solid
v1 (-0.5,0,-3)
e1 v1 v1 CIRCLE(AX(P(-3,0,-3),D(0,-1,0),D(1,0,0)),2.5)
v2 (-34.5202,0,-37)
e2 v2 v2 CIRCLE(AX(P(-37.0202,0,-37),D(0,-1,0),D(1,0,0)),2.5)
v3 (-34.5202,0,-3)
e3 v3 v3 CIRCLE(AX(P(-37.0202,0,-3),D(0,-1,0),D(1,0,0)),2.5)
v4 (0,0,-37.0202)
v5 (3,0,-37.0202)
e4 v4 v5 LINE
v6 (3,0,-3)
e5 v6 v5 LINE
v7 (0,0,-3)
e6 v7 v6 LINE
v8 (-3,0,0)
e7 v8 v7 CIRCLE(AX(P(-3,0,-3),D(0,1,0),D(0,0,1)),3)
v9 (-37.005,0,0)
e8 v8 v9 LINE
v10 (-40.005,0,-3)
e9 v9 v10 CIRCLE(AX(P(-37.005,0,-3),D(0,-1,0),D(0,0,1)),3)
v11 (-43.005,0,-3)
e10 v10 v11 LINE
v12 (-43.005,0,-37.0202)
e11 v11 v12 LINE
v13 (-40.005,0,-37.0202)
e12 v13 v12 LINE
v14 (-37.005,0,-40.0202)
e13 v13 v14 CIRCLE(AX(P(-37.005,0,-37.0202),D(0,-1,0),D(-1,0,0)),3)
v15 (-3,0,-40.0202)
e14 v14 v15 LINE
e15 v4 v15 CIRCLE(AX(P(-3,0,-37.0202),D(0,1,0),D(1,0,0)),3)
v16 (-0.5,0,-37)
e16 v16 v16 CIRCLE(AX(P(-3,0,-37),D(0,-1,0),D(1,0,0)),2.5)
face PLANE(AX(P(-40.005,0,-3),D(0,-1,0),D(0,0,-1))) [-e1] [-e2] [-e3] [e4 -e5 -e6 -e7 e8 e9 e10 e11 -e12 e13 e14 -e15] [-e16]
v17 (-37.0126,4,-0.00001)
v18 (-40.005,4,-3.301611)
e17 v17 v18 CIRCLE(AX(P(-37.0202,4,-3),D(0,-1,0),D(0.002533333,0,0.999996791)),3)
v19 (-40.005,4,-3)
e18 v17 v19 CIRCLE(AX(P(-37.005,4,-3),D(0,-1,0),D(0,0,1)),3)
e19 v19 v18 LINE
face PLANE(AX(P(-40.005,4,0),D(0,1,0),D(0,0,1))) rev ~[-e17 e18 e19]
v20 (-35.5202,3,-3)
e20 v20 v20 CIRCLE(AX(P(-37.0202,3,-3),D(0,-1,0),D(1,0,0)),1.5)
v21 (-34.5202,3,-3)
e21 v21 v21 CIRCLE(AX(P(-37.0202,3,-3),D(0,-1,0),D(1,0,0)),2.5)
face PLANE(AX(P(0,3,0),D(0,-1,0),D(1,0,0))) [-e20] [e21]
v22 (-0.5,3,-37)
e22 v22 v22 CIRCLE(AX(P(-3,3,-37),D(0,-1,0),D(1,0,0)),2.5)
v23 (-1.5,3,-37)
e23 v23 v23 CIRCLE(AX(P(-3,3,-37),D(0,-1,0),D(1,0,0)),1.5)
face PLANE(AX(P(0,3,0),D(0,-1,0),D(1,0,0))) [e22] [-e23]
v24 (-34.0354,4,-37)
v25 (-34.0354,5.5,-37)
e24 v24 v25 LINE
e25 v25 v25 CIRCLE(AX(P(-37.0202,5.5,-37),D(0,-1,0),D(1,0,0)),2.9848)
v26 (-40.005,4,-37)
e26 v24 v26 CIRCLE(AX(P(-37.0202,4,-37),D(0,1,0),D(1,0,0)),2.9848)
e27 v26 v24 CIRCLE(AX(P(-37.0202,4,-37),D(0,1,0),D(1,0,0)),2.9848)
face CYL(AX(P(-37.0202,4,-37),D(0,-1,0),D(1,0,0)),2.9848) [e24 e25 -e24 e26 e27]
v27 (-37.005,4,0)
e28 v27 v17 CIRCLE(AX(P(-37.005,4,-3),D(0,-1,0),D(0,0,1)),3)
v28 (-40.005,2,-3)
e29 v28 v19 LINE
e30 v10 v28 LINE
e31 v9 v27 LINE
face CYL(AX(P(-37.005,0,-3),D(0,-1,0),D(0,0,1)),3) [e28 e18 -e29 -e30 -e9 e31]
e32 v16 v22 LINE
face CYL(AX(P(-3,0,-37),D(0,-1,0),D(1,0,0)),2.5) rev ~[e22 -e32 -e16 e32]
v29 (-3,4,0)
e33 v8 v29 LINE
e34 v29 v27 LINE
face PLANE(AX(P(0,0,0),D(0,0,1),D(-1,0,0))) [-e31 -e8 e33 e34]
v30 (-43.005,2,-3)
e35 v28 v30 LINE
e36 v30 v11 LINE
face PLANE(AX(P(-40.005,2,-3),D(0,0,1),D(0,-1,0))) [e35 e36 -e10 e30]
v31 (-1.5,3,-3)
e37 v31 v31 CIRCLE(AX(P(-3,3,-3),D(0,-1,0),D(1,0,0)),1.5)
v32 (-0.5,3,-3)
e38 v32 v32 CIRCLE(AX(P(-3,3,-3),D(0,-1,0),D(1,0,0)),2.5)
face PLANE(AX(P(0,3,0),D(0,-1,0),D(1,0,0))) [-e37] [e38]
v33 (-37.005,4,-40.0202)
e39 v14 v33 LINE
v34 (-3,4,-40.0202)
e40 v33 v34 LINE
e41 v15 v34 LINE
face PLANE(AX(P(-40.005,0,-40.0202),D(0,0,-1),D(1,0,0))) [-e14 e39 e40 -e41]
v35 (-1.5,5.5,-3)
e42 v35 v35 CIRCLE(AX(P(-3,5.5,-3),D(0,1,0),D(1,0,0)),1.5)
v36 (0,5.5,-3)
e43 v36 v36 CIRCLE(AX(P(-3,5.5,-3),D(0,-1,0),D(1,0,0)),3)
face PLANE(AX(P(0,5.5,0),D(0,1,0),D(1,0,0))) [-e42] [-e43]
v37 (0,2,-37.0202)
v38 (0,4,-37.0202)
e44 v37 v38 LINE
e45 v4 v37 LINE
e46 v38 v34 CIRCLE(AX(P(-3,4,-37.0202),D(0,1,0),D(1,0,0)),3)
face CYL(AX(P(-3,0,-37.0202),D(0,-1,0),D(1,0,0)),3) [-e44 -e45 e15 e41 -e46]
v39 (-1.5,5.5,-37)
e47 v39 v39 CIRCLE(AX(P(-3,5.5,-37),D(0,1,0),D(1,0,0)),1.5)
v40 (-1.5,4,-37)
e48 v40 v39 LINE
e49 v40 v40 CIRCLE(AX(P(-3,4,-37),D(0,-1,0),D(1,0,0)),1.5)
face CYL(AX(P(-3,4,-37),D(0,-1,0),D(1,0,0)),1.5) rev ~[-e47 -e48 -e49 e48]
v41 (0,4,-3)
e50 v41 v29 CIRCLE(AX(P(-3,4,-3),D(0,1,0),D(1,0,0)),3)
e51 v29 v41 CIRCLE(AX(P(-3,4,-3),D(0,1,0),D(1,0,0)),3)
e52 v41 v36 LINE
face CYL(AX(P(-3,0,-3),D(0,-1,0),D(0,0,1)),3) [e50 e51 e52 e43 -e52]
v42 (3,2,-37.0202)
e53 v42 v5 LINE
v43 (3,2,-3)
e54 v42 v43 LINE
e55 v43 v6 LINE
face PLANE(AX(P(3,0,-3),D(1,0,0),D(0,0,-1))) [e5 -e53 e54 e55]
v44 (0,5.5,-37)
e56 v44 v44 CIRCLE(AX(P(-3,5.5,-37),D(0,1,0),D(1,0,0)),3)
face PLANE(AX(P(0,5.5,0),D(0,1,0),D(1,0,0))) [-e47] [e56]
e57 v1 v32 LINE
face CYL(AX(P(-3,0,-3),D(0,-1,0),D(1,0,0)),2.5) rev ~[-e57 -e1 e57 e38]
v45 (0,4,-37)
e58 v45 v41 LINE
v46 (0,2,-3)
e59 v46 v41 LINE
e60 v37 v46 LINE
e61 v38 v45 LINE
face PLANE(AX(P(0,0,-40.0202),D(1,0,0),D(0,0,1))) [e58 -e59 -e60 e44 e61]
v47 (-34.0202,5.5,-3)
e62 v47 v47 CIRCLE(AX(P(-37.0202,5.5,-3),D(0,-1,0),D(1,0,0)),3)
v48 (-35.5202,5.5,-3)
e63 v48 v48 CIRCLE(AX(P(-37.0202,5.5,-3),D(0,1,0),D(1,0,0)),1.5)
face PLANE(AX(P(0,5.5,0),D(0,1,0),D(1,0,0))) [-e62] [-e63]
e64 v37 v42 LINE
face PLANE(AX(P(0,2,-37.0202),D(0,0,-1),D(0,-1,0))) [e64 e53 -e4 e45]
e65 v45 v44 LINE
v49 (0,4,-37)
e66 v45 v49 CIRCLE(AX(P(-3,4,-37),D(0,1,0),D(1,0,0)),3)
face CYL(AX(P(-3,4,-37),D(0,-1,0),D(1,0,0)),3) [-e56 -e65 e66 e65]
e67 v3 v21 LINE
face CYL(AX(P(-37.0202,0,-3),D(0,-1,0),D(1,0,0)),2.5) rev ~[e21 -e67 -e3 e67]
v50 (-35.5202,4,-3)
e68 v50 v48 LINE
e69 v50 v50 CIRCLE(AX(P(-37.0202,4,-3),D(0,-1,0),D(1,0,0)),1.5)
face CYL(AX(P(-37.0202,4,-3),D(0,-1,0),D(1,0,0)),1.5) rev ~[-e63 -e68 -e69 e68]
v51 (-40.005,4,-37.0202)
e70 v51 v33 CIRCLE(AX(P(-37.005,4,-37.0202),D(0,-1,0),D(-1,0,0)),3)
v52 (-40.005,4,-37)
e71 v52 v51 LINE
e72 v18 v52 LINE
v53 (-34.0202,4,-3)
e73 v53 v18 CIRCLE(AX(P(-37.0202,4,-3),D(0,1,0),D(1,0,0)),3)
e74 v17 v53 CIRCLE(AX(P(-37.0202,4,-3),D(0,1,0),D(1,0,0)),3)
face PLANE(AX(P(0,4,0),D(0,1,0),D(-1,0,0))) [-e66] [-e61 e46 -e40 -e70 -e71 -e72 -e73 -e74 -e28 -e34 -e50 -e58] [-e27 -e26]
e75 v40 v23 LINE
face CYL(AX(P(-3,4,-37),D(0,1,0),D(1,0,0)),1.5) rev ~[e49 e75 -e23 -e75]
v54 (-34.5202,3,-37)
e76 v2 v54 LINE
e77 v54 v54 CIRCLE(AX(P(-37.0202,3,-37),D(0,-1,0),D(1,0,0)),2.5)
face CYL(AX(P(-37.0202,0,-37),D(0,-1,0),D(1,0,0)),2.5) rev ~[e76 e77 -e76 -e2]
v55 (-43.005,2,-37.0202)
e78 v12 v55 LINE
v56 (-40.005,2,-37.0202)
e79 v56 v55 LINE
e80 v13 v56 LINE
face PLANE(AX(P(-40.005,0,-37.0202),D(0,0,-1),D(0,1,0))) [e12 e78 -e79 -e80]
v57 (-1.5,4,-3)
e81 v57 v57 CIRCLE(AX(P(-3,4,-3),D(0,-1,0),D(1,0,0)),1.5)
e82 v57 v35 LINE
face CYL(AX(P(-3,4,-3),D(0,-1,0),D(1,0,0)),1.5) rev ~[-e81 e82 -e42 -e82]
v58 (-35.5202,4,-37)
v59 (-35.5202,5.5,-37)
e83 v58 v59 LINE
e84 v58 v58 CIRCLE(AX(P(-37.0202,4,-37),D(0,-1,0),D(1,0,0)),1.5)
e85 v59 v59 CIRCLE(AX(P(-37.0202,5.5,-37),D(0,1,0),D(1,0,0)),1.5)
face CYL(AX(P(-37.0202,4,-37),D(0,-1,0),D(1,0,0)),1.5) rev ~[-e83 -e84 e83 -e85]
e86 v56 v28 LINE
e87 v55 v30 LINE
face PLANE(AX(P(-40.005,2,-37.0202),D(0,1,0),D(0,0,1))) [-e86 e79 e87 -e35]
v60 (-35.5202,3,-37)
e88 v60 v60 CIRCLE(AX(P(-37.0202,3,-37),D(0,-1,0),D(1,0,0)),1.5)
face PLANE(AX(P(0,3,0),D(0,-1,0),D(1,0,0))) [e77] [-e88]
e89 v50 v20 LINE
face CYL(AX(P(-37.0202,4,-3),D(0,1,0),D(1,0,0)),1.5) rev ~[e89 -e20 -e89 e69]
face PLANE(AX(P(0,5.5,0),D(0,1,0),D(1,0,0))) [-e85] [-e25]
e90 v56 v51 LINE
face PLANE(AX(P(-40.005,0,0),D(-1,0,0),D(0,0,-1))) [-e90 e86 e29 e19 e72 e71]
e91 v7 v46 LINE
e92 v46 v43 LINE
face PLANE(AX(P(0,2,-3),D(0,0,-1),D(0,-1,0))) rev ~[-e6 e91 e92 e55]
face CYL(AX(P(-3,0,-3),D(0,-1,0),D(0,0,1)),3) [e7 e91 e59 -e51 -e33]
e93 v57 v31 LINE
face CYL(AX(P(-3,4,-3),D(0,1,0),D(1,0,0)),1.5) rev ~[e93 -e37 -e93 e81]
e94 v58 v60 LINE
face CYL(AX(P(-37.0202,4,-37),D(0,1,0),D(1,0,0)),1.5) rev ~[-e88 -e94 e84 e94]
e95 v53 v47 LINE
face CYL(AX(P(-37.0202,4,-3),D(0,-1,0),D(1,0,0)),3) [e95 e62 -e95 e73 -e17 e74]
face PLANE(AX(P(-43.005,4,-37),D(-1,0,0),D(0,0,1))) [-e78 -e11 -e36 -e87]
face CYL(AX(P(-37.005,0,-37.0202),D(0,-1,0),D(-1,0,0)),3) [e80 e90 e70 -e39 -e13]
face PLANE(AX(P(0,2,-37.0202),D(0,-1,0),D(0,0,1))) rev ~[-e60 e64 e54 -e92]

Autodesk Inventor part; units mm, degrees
ref_plane "YZ Plane" through (0, 0, 0) normal (1, 0, 0) x (0, 1, 0)
ref_plane "XZ Plane" through (0, 0, 0) normal (0, 1, 0) x (-1, 0, 0)
ref_plane "XY Plane" through (0, 0, 0) normal (0, 0, 1) x (1, 0, 0)
sketch "Sketch1" plane through (0, 0, 0) normal (0, 1, 0) x (-1, 0, 0)
  line L0 (0, 0) -> (40.005, 0)
  line L1 (40.005, 0) -> (40.005, -40.0202)
  line L2 (40.005, -40.0202) -> (0, -40.0202)
  line L3 (0, -40.0202) -> (0, 0)
  dimension "d26" = 40.005
  dimension "d27" = 40.0202
extrude "Extrusion1" add sketch "Sketch1" along normal blind 4
sketch "Sketch2" plane through (0, 4, 0) normal (0, 1, 0) x (1, 0, 0)
  line L0 (-40.0202, 0) -> (0, 0) projected
  line L1 (0, 0) -> (0, 40) projected
  line L2 (0, 40) -> (-40.0202, 40) projected
  line L3 (-40.0202, 40) -> (-40.0202, 0) projected
  line L4 (-37.0202, 37) -> (-3, 37)
  line L5 (-3, 37) -> (-3, 3)
  line L6 (-3, 3) -> (-37.0202, 3)
  line L7 (-37.0202, 3) -> (-37.0202, 37)
  circle A0 centre (-37.0202, 37) radius 1.5
  circle A1 centre (-3, 37) radius 1.5
  circle A2 centre (-3, 3) radius 1.5
  circle A3 centre (-37.0202, 3) radius 1.5
  dimension "d4" = 3
  dimension "d5" = 3
  dimension "d6" = 3
  dimension "d7" = 3
  dimension "d8" = 3
extrude "Extrusion2" cut sketch "Sketch2" against normal blind 4 contours L7 A0 L4 | L4 A0 L7 | A1 L5 L4 | L4 L5 A1 | A3 L6 L7 | L7 L6 A3 | A2 L6 L5 | L5 L6 A2
sketch "Sketch3" plane through (0, 4, 0) normal (0, 1, 0) x (1, 0, 0)
  circle A0 centre (-37.0202, 3) radius 1.5 projected
  circle A1 centre (-37.0202, 37) radius 1.5 projected
  circle A2 centre (-3, 37) radius 1.5 projected
  circle A3 centre (-3, 3) radius 1.5 projected
  circle A4 centre (-37.0202, 3) radius 1.5 projected
  circle A5 centre (-3, 37) radius 1.5 projected
  circle A6 centre (-37.0202, 37) radius 1.5 projected
  circle A7 centre (-3, 3) radius 1.5 projected
  line L0 (-40.005, 0) -> (0, 0) projected
  line L1 (0, 0) -> (0, 40.0202) projected
  line L2 (0, 40.0202) -> (-40.005, 40.0202) projected
  line L3 (-40.005, 40.0202) -> (-40.005, 0) projected
  circle A8 centre (-3, 37) radius 3
  circle A9 centre (-3, 3) radius 3
  circle A10 centre (-37.0202, 3) radius 3
  circle A11 centre (-37.0202, 37) radius 2.9848
extrude "Extrusion3" add sketch "Sketch3" along normal blind 1.5 contours A8 | A11 | A10 L3 | A10 L3 | A9
sketch "Sketch4" plane through (0, 0, 0) normal (0, -1, 0) x (1, 0, 0)
  circle A0 centre (-3, -37) radius 1.5 projected
  circle A1 centre (-37.0202, -37) radius 1.5 projected
  circle A2 centre (-37.0202, -3) radius 1.5 projected
  circle A3 centre (-3, -3) radius 1.5 projected
  circle A4 centre (-3, -3) radius 2.5
  circle A5 centre (-3, -37) radius 2.5
  circle A6 centre (-37.0202, -37) radius 2.5
  circle A7 centre (-37.0202, -3) radius 2.5
  point P0 (0, 0)
  dimension "d14" = 5
  dimension "d15" = 5
  dimension "d16" = 5
  dimension "d17" = 5
extrude "Extrusion4" cut sketch "Sketch4" against normal blind 3
fillet "Fillet2" radius 3 4 edges at (-40.005, 2, -40.0202) (-40.005, 2, 0) (0, 2, 0) (0, 2, -40.0202)
sketch "Sketch7" plane through (0, 0, -3) normal (1, 0, 0) x (0, 0, -1)
  line L0 (34.0202, 4) -> (34.0202, 0) projected
  line L1 (0, 0) -> (34.0202, 0)
  line L2 (34.0202, 0) -> (34.0202, 2)
  line L3 (34.0202, 2) -> (0, 2)
  line L4 (0, 2) -> (0, 0)
  point P0 (-3, 0)
  dimension "d29" = 2
extrude "Extrusion7" add sketch "Sketch7" along normal blind 3
sketch "Sketch8" plane through (-40.005, 4, -37) normal (-1, 0, 0) x (0, 0, 1)
  line L0 (34, -4) -> (-0.0202, -4) projected
  line L1 (-0.0202, -4) -> (-0.0202, -2) projected
  line L2 (-0.0202, -2) -> (34, -2) projected
  line L3 (34, -2) -> (34, -4) projected
  point P0 (37, -4)
extrude "Extrusion8" add sketch "Sketch8" along normal blind 3
properties part number "L298N-holder"
